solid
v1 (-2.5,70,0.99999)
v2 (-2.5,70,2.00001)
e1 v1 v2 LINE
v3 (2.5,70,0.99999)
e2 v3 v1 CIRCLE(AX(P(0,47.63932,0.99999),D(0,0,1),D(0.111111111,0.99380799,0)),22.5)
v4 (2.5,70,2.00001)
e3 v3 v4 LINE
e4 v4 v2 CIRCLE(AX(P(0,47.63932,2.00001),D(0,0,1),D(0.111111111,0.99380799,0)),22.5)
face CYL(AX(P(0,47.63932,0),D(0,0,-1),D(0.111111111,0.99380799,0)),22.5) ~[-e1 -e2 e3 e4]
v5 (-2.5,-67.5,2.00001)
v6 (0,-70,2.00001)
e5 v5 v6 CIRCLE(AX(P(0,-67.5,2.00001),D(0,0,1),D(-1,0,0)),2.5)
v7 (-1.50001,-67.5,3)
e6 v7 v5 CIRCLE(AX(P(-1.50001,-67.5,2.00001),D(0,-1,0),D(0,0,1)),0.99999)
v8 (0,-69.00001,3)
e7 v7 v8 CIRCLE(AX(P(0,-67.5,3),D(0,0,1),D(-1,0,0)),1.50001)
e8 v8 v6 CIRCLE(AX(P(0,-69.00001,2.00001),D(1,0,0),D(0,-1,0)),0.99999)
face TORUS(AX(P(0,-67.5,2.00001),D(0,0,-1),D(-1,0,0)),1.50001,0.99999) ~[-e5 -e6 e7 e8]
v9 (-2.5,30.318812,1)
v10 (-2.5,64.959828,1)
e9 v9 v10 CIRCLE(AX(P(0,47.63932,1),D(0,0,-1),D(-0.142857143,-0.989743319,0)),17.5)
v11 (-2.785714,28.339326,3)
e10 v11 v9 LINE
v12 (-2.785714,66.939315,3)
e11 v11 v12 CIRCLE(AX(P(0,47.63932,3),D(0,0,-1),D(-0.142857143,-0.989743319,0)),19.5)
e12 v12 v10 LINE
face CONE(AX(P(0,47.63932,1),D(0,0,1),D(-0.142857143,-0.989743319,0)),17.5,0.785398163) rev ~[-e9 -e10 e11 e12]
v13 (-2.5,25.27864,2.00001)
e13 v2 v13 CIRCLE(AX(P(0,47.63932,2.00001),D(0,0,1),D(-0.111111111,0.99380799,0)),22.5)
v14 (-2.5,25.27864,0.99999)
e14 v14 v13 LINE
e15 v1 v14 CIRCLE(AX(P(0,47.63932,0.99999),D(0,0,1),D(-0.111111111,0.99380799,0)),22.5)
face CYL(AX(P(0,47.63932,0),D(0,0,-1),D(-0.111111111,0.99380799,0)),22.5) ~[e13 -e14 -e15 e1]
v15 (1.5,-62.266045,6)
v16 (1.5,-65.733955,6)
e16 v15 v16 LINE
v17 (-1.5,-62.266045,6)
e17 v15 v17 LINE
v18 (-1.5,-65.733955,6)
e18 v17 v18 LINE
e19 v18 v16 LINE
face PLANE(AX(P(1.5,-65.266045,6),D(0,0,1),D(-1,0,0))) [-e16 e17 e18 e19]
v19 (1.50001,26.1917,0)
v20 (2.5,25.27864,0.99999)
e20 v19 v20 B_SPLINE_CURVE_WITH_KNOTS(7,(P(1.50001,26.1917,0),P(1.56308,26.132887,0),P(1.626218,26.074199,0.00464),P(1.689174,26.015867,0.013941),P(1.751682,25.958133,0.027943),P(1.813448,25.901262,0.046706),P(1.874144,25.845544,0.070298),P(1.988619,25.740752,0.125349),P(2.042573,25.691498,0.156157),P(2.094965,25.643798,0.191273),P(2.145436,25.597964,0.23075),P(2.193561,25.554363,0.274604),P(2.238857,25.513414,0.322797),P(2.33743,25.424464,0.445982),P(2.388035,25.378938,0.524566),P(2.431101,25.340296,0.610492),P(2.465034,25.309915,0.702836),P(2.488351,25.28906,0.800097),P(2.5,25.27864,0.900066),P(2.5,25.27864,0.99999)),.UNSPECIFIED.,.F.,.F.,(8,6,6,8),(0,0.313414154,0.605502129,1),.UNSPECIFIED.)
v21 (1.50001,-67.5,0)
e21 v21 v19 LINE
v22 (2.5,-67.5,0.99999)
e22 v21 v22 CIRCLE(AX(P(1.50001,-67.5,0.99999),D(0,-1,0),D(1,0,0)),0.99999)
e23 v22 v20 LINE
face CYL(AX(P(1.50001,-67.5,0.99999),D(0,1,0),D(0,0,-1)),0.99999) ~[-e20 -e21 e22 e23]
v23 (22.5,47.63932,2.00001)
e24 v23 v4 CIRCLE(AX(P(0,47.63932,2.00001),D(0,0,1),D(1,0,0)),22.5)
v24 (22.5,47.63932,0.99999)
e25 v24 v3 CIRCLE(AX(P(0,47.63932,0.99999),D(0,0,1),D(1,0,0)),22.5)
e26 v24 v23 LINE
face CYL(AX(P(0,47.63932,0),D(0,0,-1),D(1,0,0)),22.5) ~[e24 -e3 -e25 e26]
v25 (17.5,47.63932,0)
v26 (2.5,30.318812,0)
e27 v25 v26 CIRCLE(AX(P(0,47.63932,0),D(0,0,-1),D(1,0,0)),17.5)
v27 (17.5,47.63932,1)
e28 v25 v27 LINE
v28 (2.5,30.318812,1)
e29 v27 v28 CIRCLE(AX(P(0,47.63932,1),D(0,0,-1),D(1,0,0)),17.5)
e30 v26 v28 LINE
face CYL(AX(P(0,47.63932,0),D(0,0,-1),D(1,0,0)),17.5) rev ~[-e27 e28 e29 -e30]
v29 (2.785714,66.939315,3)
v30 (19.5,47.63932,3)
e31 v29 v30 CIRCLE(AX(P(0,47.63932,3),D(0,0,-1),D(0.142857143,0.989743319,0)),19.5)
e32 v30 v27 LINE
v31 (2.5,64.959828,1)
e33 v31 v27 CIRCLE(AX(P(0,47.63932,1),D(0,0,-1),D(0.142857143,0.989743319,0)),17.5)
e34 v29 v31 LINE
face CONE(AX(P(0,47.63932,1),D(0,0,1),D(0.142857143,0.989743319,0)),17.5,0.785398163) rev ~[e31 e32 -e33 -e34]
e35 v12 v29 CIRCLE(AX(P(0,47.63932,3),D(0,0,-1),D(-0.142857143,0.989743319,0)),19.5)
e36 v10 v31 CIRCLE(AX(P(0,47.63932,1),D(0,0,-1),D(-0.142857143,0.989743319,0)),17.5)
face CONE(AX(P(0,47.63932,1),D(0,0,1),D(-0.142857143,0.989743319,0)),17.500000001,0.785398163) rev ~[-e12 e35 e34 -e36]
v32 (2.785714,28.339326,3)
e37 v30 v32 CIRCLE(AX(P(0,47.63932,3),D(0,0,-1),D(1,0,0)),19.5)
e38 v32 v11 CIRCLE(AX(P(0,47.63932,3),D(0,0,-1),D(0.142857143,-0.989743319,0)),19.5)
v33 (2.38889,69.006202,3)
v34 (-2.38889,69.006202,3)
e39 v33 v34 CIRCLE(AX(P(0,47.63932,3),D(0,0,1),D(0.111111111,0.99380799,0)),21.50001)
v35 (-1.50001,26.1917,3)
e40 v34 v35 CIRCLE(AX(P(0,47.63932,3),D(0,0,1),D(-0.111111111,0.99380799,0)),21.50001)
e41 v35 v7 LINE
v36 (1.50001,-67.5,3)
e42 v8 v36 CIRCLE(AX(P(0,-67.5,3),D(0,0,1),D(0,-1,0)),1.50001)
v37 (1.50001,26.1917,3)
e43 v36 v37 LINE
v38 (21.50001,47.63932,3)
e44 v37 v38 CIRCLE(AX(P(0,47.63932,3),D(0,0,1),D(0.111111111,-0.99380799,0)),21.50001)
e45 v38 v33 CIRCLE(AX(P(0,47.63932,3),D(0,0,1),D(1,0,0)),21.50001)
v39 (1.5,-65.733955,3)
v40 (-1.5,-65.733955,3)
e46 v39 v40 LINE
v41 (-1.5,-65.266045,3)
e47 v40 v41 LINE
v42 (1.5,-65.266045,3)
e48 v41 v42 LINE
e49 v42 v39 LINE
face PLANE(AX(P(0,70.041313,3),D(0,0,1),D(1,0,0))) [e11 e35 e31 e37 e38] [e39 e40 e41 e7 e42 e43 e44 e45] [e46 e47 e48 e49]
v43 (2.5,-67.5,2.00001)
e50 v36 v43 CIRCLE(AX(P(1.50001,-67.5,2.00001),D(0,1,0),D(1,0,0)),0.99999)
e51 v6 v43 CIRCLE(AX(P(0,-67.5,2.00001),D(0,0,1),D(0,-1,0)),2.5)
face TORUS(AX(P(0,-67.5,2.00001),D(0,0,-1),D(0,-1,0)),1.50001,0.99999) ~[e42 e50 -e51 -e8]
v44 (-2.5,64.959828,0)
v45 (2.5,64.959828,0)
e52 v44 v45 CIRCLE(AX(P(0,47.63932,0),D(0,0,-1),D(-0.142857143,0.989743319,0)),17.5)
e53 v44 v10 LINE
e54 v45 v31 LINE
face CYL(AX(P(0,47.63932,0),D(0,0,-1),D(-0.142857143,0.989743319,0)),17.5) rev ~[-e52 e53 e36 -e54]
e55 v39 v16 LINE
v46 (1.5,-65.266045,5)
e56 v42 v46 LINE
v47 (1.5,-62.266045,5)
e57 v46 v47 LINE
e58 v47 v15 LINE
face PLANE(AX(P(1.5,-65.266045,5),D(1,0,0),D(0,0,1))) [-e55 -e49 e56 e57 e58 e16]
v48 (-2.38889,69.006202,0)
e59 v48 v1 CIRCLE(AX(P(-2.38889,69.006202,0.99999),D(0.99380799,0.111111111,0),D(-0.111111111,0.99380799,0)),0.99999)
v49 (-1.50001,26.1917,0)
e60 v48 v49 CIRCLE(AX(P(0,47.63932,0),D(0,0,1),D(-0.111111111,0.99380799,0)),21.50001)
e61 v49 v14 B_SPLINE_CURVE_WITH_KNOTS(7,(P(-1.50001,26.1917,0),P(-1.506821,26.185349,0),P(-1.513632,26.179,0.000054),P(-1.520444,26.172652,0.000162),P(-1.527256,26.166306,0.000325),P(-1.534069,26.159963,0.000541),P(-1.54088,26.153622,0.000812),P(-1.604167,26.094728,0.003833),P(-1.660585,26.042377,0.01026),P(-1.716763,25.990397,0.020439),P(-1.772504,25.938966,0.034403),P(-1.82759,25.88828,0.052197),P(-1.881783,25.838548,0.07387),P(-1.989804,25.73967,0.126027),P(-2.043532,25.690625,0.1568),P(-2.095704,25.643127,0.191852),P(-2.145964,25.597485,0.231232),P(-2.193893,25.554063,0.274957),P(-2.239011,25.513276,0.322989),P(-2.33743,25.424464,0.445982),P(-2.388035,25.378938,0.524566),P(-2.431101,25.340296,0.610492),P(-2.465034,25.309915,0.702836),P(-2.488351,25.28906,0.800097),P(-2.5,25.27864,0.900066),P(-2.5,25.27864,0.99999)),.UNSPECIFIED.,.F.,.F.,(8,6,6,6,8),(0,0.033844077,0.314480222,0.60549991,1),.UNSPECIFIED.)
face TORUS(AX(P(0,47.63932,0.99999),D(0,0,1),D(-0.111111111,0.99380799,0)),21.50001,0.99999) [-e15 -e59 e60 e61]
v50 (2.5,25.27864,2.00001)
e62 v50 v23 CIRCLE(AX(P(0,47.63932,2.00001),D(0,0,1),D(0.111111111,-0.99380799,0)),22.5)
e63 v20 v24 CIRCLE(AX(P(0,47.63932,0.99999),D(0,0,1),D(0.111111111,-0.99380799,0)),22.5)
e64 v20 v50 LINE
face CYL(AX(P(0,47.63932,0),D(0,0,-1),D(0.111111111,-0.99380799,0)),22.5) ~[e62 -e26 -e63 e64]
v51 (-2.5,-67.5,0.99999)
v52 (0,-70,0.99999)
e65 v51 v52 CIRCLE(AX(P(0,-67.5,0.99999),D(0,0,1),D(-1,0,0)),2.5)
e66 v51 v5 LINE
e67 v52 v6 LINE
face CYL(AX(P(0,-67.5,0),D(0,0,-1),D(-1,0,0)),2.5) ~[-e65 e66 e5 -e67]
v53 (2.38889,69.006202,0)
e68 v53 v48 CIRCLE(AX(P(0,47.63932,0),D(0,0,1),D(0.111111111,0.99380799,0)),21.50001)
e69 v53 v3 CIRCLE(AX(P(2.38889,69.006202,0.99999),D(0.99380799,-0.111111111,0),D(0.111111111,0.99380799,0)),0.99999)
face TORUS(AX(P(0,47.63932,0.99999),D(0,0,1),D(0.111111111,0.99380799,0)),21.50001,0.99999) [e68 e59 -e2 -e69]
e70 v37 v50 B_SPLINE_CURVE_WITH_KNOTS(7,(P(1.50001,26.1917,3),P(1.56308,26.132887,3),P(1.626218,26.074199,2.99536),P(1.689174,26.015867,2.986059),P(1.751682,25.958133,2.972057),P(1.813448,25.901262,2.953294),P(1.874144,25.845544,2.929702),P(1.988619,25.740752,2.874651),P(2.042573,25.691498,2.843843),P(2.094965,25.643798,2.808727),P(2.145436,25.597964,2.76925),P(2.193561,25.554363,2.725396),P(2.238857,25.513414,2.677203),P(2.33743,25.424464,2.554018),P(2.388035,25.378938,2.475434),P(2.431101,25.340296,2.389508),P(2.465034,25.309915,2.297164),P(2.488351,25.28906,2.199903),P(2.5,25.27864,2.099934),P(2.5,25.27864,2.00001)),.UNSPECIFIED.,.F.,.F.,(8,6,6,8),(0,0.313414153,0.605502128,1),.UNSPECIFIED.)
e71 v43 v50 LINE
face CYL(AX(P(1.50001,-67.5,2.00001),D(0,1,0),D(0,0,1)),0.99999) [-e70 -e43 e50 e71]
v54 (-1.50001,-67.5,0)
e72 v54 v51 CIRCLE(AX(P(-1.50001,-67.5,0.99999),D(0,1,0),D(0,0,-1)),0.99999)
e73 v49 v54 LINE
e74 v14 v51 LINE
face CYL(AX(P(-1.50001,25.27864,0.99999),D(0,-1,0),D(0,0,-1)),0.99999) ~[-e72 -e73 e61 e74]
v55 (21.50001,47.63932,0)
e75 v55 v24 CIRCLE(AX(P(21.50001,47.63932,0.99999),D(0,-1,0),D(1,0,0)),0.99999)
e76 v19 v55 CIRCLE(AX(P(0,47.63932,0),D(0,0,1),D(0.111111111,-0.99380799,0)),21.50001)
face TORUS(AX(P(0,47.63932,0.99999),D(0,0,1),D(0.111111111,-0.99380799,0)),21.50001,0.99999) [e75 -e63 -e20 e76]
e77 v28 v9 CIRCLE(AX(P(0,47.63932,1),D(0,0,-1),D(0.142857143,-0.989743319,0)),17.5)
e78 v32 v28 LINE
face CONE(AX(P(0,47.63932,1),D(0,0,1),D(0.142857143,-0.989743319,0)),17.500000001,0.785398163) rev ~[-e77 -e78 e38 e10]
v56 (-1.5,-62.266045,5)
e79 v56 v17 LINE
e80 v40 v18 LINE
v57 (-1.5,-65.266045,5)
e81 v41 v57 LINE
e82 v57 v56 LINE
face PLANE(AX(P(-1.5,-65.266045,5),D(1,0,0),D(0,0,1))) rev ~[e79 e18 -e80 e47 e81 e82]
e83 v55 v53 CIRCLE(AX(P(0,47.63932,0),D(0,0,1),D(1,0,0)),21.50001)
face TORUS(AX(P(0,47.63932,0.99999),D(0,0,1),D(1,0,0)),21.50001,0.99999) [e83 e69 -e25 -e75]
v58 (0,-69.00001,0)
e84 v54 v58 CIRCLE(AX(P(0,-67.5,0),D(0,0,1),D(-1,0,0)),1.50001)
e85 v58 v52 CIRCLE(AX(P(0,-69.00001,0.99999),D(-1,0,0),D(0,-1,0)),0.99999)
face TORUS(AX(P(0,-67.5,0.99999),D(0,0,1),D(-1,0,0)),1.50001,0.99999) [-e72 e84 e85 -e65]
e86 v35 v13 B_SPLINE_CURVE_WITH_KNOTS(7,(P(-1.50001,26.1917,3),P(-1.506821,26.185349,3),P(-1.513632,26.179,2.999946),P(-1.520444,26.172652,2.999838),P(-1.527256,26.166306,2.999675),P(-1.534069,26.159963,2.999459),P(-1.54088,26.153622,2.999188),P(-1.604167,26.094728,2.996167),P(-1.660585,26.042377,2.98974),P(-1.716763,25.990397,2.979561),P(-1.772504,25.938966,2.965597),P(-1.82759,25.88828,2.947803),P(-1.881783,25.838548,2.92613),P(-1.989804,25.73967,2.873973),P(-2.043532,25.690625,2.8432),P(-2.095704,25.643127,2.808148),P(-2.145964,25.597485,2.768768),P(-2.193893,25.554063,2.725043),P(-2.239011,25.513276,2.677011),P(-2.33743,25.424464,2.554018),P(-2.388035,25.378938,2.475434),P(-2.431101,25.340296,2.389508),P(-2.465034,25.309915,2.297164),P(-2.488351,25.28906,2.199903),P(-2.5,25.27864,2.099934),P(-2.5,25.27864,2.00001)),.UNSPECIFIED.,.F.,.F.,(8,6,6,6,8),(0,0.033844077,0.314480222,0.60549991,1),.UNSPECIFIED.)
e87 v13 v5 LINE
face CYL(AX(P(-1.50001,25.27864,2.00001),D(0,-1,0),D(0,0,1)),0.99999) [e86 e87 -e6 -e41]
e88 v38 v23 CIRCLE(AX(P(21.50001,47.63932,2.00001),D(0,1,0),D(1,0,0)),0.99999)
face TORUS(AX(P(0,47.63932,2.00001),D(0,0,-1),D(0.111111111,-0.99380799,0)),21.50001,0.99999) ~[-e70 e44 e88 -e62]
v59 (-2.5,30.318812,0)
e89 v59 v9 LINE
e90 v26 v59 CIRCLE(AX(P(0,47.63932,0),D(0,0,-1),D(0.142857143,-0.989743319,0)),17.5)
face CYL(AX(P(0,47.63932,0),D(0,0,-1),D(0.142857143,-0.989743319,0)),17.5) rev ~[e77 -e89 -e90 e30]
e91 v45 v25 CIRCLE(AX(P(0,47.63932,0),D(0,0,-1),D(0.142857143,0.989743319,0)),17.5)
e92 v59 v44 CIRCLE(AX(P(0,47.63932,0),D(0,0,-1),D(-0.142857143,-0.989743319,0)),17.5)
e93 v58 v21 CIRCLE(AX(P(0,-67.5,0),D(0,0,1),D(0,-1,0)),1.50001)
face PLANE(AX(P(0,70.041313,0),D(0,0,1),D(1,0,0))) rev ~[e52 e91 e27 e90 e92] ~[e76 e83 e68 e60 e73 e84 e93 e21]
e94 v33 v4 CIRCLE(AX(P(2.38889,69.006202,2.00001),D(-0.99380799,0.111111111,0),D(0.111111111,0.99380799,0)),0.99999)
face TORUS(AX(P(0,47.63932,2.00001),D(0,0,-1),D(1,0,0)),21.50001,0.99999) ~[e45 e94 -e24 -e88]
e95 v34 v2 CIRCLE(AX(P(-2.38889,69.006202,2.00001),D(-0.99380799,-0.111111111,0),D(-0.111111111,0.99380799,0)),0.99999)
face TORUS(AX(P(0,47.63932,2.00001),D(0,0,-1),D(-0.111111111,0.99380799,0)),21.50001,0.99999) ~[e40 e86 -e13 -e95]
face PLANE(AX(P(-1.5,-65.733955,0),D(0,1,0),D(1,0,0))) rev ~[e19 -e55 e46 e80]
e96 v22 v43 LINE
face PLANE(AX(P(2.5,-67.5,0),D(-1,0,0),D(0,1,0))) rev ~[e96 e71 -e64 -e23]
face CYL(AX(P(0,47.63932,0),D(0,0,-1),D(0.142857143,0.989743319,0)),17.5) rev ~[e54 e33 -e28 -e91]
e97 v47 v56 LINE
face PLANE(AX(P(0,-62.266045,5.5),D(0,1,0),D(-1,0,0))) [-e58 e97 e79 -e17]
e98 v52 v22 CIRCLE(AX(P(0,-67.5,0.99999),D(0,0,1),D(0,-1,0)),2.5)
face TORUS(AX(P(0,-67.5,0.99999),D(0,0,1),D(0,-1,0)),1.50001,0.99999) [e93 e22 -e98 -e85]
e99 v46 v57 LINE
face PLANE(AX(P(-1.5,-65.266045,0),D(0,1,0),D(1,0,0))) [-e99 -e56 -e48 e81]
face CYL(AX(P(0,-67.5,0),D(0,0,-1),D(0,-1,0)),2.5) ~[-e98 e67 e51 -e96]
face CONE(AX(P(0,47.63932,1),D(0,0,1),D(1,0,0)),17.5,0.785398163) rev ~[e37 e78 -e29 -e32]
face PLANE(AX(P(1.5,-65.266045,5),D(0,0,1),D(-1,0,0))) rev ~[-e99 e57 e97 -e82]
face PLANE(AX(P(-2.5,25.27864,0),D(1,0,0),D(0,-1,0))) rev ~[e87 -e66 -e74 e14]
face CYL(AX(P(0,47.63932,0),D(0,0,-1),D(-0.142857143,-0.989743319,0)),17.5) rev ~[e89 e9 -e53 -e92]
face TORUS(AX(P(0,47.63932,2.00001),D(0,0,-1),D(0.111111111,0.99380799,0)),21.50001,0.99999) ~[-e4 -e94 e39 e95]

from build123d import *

# Parameters (mm, degrees)
F1_DEPTH = 3
F0_W     = 3
F0_H     = 0.2339549768
F2_DEPTH = 6
F3_W     = 3
F3_H     = 1
F4_DEPTH = 3
F5_R     = 0.99999
F6_SIZE  = 2


# Not quite as in the source:
# - a fillet or chamfer is up to 0.001 mm smaller than in the source, because OpenCascade refuses the exact size
# - a feature names something its author has since deleted; it is built from what else it names


with BuildPart() as f1:
    # F0 (on Top) → F1 (new body)
    with BuildSketch(Plane.XY):
        with BuildLine():
            Line((-2.5, 70), (2.5, 70))
            ThreePointArc((2.5, 70), (0, 70.139320225), (-2.5, 70))
        make_face()
        with BuildLine():
            ThreePointArc((22.5, 47.639320225), (16.7705098312, 62.639320225), (2.5, 70))
            Line((2.5, 70), (2.5, 64.9598283007))
            ThreePointArc((2.5, 64.9598283007), (13.2287565553, 59.0957594624), (17.5, 47.639320225))
            ThreePointArc((17.5, 47.639320225), (13.2287565553, 36.1828809876), (2.5, 30.3188121493))
            Line((2.5, 30.3188121493), (2.5, 25.27864045))
            ThreePointArc((2.5, 25.27864045), (16.7705098312, 32.639320225), (22.5, 47.639320225))
        make_face()
        with BuildLine():
            Line((-2.5, 64.9598283007), (-2.5, 70))
            ThreePointArc((-2.5, 70), (-22.5, 47.639320225), (-2.5, 25.27864045))
            Line((-2.5, 25.27864045), (-2.5, 30.3188121493))
            ThreePointArc((-2.5, 30.3188121493), (-17.5, 47.639320225), (-2.5, 64.9598283007))
        make_face()
        with BuildLine():
            Line((2.5, 64.9598283007), (2.5, 70))
            Line((2.5, 70), (-2.5, 70))
            Line((-2.5, 70), (-2.5, 64.9598283007))
            ThreePointArc((-2.5, 64.9598283007), (0, 65.139320225), (2.5, 64.9598283007))
        make_face()
        with BuildLine():
            Line((-2.5, 30.3188121493), (-2.5, 25.27864045))
            ThreePointArc((-2.5, 25.27864045), (0, 25.139320225), (2.5, 25.27864045))
            Line((2.5, 25.27864045), (2.5, 30.3188121493))
            ThreePointArc((2.5, 30.3188121493), (0, 30.139320225), (-2.5, 30.3188121493))
        make_face()
        with BuildLine():
            Line((-1.5, -65.5), (-2.5, -65.5))
            Line((-2.5, -65.5), (-2.5, -67.5))
            ThreePointArc((-2.5, -67.5), (-1.767766953, -69.267766953), (0, -70))
            ThreePointArc((0, -70), (1.767766953, -69.267766953), (2.5, -67.5))
            Line((2.5, -67.5), (2.5, -65.5))
            Line((2.5, -65.5), (1.5, -65.5))
            Line((1.5, -65.5), (1.5, -65.7339549768))
            Line((1.5, -65.7339549768), (-1.5, -65.7339549768))
            Line((-1.5, -65.7339549768), (-1.5, -65.5))
        make_face()
        with BuildLine():
            ThreePointArc((2.5, 25.27864045), (0, 25.139320225), (-2.5, 25.27864045))
            Line((-2.5, 25.27864045), (-2.5, -65.5))
            Line((-2.5, -65.5), (-1.5, -65.5))
            Line((-1.5, -65.5), (-1.5, -65.2660450232))
            Line((-1.5, -65.2660450232), (1.5, -65.2660450232))
            Line((1.5, -65.2660450232), (1.5, -65.5))
            Line((1.5, -65.5), (2.5, -65.5))
            Line((2.5, -65.5), (2.5, 25.27864045))
        make_face()
    extrude(amount=F1_DEPTH)

    # F0 (on Top) → F2 (join)
    with BuildSketch(Plane.XY):
        with Locations((0, -65.3830225116)):
            Rectangle(F0_W, F0_H)
        with Locations((0, -65.6169774884)):
            Rectangle(F0_W, F0_H)
    extrude(amount=F2_DEPTH)

    # F3 (on face) → F4 (join)
    with BuildSketch(Plane(origin=(0, -65.2660450232, 0), x_dir=(-1, 0, 0), z_dir=(0, 1, 0))):
        with Locations((0, 5.5)):
            Rectangle(F3_W, F3_H)
    extrude(amount=F4_DEPTH)

    # F5 (radius 1 in the source; OpenCascade refuses exactly that, so slightly less here)
    f5_edges = [f1.edges().sort_by_distance(p)[0] for p in [
        (0, 70.13932, 3),
        (0, 70.13932, 0),
        (2.5, -21.11068, 0),
        (2.5, -21.11068, 3),
        (-2.5, -21.11068, 3),
        (-2.5, -21.11068, 0),
    ]]
    fillet(f5_edges, radius=F5_R)

    # F6
    f6_edges = [f1.edges().sort_by_distance(p)[0] for p in [
        (-2.5, 64.959828, 3),
    ]]
    chamfer(f6_edges, length=F6_SIZE)


solid = f1.part
